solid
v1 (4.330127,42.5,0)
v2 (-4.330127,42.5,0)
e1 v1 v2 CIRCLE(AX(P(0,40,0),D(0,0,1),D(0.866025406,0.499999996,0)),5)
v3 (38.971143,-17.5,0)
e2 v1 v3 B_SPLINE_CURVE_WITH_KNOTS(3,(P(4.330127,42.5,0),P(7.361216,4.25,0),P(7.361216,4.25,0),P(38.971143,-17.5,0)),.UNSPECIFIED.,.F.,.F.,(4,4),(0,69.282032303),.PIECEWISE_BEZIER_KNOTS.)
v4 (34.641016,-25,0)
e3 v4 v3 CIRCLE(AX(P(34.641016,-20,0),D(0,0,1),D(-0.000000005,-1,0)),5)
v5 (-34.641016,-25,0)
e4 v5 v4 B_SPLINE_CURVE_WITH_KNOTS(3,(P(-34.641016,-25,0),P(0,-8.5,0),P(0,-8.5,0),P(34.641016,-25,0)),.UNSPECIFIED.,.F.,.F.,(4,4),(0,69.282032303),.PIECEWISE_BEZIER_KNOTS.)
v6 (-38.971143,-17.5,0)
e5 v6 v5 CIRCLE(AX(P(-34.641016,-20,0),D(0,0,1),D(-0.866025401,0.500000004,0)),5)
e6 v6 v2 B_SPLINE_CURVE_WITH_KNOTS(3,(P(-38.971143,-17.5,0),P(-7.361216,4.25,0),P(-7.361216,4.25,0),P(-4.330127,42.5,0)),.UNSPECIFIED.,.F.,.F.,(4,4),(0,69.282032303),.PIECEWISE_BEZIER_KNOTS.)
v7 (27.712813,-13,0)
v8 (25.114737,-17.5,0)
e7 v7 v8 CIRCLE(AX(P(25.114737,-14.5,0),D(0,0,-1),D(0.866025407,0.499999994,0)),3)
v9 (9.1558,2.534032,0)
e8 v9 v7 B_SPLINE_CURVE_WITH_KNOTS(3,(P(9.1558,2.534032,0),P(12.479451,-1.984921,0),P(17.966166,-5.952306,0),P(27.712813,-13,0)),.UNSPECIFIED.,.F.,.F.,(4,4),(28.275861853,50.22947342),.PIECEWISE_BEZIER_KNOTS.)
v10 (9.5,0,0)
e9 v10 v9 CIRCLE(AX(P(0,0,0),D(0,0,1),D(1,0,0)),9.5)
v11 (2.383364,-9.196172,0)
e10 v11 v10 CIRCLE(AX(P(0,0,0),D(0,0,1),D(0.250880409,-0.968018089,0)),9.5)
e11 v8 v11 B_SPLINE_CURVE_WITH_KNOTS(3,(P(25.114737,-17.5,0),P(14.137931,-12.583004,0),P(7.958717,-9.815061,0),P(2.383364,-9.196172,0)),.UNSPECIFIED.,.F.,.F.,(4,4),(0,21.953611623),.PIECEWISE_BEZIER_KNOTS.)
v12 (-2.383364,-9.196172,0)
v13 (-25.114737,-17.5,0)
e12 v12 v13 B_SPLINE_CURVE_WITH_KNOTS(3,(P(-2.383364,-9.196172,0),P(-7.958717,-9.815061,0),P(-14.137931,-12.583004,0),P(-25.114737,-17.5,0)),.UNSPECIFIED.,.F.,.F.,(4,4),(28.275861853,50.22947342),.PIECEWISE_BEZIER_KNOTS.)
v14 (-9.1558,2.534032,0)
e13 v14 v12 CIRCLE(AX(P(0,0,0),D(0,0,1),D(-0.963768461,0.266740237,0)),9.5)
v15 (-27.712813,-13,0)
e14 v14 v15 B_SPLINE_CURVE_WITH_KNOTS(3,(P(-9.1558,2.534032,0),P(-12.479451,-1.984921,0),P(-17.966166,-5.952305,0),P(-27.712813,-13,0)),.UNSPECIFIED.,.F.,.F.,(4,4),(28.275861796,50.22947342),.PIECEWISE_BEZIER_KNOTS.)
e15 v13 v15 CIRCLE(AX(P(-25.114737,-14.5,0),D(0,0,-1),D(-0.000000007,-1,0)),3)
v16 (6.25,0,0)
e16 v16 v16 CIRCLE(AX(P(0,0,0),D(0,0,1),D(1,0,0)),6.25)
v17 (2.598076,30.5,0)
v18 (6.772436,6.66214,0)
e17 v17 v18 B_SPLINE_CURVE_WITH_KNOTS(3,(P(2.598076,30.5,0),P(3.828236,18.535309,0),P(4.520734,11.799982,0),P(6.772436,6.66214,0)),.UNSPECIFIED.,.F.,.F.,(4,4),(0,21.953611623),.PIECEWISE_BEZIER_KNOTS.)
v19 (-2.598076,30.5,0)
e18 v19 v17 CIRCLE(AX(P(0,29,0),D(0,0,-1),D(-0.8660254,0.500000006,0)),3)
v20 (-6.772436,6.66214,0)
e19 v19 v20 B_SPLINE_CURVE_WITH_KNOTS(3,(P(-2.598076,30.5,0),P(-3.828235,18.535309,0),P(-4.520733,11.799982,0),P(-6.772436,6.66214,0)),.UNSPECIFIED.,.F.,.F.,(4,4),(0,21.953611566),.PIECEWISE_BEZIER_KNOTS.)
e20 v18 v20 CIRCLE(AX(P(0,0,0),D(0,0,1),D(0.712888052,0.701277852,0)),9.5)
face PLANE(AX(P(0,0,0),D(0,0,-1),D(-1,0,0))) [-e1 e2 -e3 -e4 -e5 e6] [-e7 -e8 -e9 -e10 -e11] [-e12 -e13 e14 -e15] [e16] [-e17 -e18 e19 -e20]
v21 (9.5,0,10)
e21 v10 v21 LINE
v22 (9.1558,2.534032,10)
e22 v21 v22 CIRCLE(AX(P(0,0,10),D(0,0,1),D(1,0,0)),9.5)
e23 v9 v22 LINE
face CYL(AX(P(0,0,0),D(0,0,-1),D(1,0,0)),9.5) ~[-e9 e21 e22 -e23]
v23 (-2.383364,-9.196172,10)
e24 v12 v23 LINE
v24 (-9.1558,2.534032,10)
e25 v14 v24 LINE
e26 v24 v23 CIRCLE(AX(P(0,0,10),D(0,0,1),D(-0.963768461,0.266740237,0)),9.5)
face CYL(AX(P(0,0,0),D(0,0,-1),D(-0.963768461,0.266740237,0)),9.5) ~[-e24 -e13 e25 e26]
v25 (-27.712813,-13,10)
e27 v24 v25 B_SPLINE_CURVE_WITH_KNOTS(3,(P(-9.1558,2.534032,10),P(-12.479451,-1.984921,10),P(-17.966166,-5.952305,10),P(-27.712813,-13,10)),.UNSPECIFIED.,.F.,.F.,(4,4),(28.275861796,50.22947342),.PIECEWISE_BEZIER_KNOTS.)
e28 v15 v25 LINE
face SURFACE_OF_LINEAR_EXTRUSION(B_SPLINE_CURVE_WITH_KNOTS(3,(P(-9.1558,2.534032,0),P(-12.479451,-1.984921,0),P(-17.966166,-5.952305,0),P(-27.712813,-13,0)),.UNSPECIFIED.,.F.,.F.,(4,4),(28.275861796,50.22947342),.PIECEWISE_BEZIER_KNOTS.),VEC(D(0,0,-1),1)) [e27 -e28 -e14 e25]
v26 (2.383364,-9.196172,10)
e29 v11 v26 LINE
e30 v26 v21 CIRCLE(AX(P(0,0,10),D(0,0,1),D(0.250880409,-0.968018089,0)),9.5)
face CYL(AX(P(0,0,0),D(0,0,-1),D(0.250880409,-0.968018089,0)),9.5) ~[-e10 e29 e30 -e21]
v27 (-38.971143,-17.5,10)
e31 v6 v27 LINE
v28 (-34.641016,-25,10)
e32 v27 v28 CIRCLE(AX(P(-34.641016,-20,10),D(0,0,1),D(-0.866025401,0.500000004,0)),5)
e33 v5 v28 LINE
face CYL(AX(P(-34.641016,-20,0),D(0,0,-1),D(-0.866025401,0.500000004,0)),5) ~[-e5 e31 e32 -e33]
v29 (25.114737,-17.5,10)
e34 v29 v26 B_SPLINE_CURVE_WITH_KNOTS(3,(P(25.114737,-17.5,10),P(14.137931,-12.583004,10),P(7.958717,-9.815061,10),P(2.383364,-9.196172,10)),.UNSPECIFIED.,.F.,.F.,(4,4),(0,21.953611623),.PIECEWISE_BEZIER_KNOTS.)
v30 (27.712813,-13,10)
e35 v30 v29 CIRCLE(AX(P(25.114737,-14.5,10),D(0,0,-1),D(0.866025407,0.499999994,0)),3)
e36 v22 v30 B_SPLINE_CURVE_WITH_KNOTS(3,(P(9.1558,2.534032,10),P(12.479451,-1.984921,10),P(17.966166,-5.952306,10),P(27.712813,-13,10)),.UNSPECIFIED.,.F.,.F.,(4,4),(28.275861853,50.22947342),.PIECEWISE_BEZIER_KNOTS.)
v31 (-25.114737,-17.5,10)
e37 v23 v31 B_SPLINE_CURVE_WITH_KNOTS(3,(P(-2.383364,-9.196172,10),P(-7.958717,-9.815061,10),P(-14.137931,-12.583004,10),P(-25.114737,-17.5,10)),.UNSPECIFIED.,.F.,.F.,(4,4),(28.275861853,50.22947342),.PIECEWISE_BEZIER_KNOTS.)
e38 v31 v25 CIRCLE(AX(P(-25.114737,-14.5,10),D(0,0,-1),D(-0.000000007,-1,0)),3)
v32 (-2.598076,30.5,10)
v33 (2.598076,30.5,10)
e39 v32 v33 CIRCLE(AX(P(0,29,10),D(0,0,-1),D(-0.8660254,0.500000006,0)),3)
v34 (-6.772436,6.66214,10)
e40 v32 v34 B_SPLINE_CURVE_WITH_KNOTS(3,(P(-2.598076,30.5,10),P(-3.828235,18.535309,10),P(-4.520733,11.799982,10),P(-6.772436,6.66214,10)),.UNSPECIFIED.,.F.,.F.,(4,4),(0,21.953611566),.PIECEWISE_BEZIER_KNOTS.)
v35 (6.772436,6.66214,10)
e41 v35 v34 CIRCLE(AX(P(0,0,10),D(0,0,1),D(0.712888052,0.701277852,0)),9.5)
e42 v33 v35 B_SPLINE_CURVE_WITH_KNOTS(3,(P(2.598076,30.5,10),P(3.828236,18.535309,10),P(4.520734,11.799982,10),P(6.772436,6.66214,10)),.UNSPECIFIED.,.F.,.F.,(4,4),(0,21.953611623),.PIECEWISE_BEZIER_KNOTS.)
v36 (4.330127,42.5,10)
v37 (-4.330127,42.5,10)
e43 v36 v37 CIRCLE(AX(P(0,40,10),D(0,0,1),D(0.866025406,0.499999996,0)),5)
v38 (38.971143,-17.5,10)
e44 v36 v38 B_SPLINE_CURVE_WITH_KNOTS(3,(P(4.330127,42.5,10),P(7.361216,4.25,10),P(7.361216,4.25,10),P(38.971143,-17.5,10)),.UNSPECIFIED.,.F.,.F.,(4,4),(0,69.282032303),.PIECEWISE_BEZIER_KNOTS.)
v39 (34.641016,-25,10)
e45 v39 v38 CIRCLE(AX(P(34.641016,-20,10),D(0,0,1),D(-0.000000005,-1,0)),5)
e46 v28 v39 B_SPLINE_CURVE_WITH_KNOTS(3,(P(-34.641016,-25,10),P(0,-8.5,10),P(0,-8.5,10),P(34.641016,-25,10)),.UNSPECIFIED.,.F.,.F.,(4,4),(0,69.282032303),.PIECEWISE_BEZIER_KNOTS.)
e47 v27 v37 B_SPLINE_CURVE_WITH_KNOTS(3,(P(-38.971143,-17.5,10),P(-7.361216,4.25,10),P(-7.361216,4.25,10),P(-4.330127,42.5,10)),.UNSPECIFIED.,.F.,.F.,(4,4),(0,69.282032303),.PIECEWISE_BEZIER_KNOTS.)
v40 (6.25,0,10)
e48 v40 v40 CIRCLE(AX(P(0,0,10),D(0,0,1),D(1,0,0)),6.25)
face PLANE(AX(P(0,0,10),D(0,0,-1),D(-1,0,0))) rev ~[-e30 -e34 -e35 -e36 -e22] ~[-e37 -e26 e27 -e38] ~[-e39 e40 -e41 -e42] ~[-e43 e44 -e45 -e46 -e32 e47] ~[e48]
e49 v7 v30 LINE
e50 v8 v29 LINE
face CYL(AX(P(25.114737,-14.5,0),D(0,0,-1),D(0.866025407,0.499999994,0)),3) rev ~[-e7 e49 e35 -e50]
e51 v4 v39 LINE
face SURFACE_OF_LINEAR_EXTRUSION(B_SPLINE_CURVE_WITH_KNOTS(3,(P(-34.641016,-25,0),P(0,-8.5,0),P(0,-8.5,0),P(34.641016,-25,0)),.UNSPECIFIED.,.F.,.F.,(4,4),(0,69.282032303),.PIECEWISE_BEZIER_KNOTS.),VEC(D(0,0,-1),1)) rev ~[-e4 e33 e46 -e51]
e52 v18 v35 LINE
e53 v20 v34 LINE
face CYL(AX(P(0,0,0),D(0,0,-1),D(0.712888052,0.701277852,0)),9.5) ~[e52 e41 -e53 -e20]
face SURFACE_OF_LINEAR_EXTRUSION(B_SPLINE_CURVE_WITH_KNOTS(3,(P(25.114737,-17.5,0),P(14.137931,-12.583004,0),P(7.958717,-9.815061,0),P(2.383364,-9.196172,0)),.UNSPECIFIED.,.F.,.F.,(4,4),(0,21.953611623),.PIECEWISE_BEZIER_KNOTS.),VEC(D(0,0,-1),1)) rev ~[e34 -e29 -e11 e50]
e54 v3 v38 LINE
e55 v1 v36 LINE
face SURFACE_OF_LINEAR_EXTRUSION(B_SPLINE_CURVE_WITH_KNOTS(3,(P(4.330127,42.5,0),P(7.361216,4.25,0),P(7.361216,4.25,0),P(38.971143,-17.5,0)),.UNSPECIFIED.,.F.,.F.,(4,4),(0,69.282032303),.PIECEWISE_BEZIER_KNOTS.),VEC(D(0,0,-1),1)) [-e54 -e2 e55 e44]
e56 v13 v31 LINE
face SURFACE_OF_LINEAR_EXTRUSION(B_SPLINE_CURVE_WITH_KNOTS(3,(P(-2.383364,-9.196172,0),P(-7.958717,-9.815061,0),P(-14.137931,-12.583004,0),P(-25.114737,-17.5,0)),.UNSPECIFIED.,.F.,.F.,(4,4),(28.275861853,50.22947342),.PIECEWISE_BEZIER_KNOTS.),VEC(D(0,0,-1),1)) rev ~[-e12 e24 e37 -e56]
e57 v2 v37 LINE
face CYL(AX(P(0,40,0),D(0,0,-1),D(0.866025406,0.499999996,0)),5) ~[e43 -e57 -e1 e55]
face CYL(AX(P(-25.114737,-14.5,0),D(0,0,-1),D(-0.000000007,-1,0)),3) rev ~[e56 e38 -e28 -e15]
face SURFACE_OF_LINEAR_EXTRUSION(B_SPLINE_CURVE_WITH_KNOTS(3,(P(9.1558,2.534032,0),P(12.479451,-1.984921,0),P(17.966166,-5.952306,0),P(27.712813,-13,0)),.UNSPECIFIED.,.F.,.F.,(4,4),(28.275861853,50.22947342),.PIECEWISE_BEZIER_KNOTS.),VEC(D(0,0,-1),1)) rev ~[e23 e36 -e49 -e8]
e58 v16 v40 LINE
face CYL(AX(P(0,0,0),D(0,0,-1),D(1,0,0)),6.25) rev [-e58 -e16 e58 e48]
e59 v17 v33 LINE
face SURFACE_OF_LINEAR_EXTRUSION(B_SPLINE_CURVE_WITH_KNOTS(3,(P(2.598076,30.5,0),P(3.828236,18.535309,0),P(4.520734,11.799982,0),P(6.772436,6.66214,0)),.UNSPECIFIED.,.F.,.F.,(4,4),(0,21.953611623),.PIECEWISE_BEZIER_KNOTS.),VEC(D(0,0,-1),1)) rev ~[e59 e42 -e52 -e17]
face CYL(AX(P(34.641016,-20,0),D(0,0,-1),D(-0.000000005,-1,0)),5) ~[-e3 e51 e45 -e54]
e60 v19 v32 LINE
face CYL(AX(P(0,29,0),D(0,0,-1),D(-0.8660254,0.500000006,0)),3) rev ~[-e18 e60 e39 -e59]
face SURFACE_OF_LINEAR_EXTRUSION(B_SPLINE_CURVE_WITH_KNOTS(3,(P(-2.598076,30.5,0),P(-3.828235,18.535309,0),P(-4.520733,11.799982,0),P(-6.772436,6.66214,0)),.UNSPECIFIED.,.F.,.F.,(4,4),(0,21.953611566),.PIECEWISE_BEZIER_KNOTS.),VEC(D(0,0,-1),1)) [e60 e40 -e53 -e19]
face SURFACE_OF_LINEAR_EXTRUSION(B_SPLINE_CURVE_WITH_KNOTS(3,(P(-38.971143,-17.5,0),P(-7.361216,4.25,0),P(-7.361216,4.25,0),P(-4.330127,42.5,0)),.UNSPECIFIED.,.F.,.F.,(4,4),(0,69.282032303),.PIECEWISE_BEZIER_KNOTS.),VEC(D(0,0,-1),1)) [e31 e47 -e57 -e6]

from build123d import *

# Parameters (mm, degrees)
F0_R     = 6.25
F1_DEPTH = 10


# Not quite as in the source:
# - a feature names something its author has since deleted; it is built from what else it names


with BuildPart() as f1:
    # F0 (on Top) → F1 (new body)
    with BuildSketch(Plane.XY):
        with BuildLine():
            add(Edge.make_bspline(
                [(4.3301272175, 42.4999999798), (7.3612159322, 4.25), (7.3612159322, 4.25), (38.9711430885, -17.5000001821)],
                knots=[0, 0, 0, 0, 69.2820323028, 69.2820323028, 69.2820323028, 69.2820323028], degree=3))
            ThreePointArc((4.3301272175, 42.4999999798), (2.102e-07, 45), (-4.3301268204, 42.5000000202))
            add(Edge.make_bspline(
                [(-38.9711432521, -17.4999998179), (-7.3612159322, 4.25), (-7.3612159322, 4.25), (-4.3301268204, 42.5000000202)],
                knots=[0, 0, 0, 0, 69.2820323028, 69.2820323028, 69.2820323028, 69.2820323028], degree=3))
            ThreePointArc((-38.9711432521, -17.4999998179), (-38.9711432754, -22.4999998179), (-34.6410162682, -24.9999998382))
            add(Edge.make_bspline(
                [(-34.6410162682, -24.9999998382), (0, -8.5), (0, -8.5), (34.6410160346, -25.0000001618)],
                knots=[0, 0, 0, 0, 69.2820323028, 69.2820323028, 69.2820323028, 69.2820323028], degree=3))
            ThreePointArc((34.6410160346, -25.0000001618), (38.9711430652, -22.5000001821), (38.9711430885, -17.5000001821))
        make_face()
        with BuildLine():
            ThreePointArc((6.7724364928, 6.6621395926), (8.2272413629, 4.7499999534), (9.1558004059, 2.5340321482))
            add(Edge.make_bspline(
                [(9.1558004059, 2.5340321482), (12.4794508791, -1.9849209314), (17.9661663578, -5.9523055453), (27.7128128343, -13.0000001849)],
                knots=[28.2758618531, 28.2758618531, 28.2758618531, 28.2758618531, 50.2294734195, 50.2294734195, 50.2294734195, 50.2294734195], degree=3))
            ThreePointArc((27.7128128343, -13.0000001849), (27.7128128143, -16.0000001849), (25.114736593, -17.5000001676))
            add(Edge.make_bspline(
                [(25.114736593, -17.5000001676), (14.1379308325, -12.5830038779), (7.9587172847, -9.8150611129), (2.3833638843, -9.1961718446)],
                knots=[0, 0, 0, 0, 21.953611623, 21.953611623, 21.953611623, 21.953611623], degree=3))
            ThreePointArc((2.3833638843, -9.1961718446), (-5.39e-08, -9.5), (-2.3833639886, -9.1961718175))
            add(Edge.make_bspline(
                [(-2.3833639886, -9.1961718175), (-7.9587173906, -9.8150610209), (-14.1379309923, -12.5830037018), (-25.1147368265, -17.4999998324)],
                knots=[28.2758618531, 28.2758618531, 28.2758618531, 28.2758618531, 50.2294734195, 50.2294734195, 50.2294734195, 50.2294734195], degree=3))
            ThreePointArc((-25.1147368265, -17.4999998324), (-27.7128130279, -15.9999998151), (-27.7128130079, -12.9999998151))
            add(Edge.make_bspline(
                [(-9.1558003771, 2.534032252), (-12.4794509058, -1.9849207937), (-17.9661664304, -5.9523053189), (-27.7128130079, -12.9999998151)],
                knots=[28.2758617965, 28.2758617965, 28.2758617965, 28.2758617965, 50.2294734195, 50.2294734195, 50.2294734195, 50.2294734195], degree=3))
            ThreePointArc((-9.1558003771, 2.534032252), (-8.227241309, 4.7500000466), (-6.7724364173, 6.6621396694))
            add(Edge.make_bspline(
                [(-2.5980760078, 30.5000000173), (-3.8282353656, 18.5353092472), (-4.5207334885, 11.7999819523), (-6.7724364173, 6.6621396694)],
                knots=[0, 0, 0, 0, 21.9536115664, 21.9536115664, 21.9536115664, 21.9536115664], degree=3))
            ThreePointArc((-2.5980760078, 30.5000000173), (2.136e-07, 32), (2.5980764149, 30.4999999827))
            add(Edge.make_bspline(
                [(2.5980764149, 30.4999999827), (3.8282355979, 18.5353091968), (4.5207336211, 11.7999819066), (6.7724364928, 6.6621395926)],
                knots=[0, 0, 0, 0, 21.953611623, 21.953611623, 21.953611623, 21.953611623], degree=3))
        make_face(mode=Mode.SUBTRACT)
        with BuildLine():
            add(Edge.make_bspline(
                [(6.7724364928, 6.6621395926), (7.4208869274, 5.1825322592), (8.1986480984, 3.8354103774), (9.1558004059, 2.5340321482)],
                knots=[21.953611623, 21.953611623, 21.953611623, 21.953611623, 28.2758618531, 28.2758618531, 28.2758618531, 28.2758618531], degree=3))
            ThreePointArc((9.1558004059, 2.5340321482), (8.2272413629, 4.7499999534), (6.7724364928, 6.6621395926))
        make_face()
        with BuildLine():
            ThreePointArc((-2.3833639886, -9.1961718175), (-5.39e-08, -9.5), (2.3833638843, -9.1961718446))
            add(Edge.make_bspline(
                [(2.3833638843, -9.1961718446), (0.7777611287, -9.0179427274), (-0.7777612284, -9.0179427186), (-2.3833639886, -9.1961718175)],
                knots=[21.953611623, 21.953611623, 21.953611623, 21.953611623, 28.2758618531, 28.2758618531, 28.2758618531, 28.2758618531], degree=3))
        make_face()
        with BuildLine():
            add(Edge.make_bspline(
                [(-6.7724364173, 6.6621396694), (-7.42088687, 5.1825323411), (-8.1986480561, 3.8354104682), (-9.1558003771, 2.534032252)],
                knots=[21.9536115664, 21.9536115664, 21.9536115664, 21.9536115664, 28.2758617965, 28.2758617965, 28.2758617965, 28.2758617965], degree=3))
            ThreePointArc((-6.7724364173, 6.6621396694), (-8.227241309, 4.7500000466), (-9.1558003771, 2.534032252))
        make_face()
        with BuildLine():
            ThreePointArc((2.3833638843, -9.1961718446), (7.5130538698, -5.814122595), (9.5, 0))
            ThreePointArc((9.5, 0), (9.413556816, 1.2786508797), (9.1558004059, 2.5340321482))
            add(Edge.make_bspline(
                [(6.7724364928, 6.6621395926), (7.4208869274, 5.1825322592), (8.1986480984, 3.8354103774), (9.1558004059, 2.5340321482)],
                knots=[21.953611623, 21.953611623, 21.953611623, 21.953611623, 28.2758618531, 28.2758618531, 28.2758618531, 28.2758618531], degree=3))
            ThreePointArc((6.7724364928, 6.6621395926), (5.39e-08, 9.5), (-6.7724364173, 6.6621396694))
            add(Edge.make_bspline(
                [(-6.7724364173, 6.6621396694), (-7.42088687, 5.1825323411), (-8.1986480561, 3.8354104682), (-9.1558003771, 2.534032252)],
                knots=[21.9536115664, 21.9536115664, 21.9536115664, 21.9536115664, 28.2758617965, 28.2758617965, 28.2758617965, 28.2758617965], degree=3))
            ThreePointArc((-9.1558003771, 2.534032252), (-8.2272413629, -4.7499999534), (-2.3833639886, -9.1961718175))
            add(Edge.make_bspline(
                [(2.3833638843, -9.1961718446), (0.7777611287, -9.0179427274), (-0.7777612284, -9.0179427186), (-2.3833639886, -9.1961718175)],
                knots=[21.953611623, 21.953611623, 21.953611623, 21.953611623, 28.2758618531, 28.2758618531, 28.2758618531, 28.2758618531], degree=3))
        make_face()
        Circle(F0_R, mode=Mode.SUBTRACT)
    extrude(amount=F1_DEPTH)


solid = f1.part
